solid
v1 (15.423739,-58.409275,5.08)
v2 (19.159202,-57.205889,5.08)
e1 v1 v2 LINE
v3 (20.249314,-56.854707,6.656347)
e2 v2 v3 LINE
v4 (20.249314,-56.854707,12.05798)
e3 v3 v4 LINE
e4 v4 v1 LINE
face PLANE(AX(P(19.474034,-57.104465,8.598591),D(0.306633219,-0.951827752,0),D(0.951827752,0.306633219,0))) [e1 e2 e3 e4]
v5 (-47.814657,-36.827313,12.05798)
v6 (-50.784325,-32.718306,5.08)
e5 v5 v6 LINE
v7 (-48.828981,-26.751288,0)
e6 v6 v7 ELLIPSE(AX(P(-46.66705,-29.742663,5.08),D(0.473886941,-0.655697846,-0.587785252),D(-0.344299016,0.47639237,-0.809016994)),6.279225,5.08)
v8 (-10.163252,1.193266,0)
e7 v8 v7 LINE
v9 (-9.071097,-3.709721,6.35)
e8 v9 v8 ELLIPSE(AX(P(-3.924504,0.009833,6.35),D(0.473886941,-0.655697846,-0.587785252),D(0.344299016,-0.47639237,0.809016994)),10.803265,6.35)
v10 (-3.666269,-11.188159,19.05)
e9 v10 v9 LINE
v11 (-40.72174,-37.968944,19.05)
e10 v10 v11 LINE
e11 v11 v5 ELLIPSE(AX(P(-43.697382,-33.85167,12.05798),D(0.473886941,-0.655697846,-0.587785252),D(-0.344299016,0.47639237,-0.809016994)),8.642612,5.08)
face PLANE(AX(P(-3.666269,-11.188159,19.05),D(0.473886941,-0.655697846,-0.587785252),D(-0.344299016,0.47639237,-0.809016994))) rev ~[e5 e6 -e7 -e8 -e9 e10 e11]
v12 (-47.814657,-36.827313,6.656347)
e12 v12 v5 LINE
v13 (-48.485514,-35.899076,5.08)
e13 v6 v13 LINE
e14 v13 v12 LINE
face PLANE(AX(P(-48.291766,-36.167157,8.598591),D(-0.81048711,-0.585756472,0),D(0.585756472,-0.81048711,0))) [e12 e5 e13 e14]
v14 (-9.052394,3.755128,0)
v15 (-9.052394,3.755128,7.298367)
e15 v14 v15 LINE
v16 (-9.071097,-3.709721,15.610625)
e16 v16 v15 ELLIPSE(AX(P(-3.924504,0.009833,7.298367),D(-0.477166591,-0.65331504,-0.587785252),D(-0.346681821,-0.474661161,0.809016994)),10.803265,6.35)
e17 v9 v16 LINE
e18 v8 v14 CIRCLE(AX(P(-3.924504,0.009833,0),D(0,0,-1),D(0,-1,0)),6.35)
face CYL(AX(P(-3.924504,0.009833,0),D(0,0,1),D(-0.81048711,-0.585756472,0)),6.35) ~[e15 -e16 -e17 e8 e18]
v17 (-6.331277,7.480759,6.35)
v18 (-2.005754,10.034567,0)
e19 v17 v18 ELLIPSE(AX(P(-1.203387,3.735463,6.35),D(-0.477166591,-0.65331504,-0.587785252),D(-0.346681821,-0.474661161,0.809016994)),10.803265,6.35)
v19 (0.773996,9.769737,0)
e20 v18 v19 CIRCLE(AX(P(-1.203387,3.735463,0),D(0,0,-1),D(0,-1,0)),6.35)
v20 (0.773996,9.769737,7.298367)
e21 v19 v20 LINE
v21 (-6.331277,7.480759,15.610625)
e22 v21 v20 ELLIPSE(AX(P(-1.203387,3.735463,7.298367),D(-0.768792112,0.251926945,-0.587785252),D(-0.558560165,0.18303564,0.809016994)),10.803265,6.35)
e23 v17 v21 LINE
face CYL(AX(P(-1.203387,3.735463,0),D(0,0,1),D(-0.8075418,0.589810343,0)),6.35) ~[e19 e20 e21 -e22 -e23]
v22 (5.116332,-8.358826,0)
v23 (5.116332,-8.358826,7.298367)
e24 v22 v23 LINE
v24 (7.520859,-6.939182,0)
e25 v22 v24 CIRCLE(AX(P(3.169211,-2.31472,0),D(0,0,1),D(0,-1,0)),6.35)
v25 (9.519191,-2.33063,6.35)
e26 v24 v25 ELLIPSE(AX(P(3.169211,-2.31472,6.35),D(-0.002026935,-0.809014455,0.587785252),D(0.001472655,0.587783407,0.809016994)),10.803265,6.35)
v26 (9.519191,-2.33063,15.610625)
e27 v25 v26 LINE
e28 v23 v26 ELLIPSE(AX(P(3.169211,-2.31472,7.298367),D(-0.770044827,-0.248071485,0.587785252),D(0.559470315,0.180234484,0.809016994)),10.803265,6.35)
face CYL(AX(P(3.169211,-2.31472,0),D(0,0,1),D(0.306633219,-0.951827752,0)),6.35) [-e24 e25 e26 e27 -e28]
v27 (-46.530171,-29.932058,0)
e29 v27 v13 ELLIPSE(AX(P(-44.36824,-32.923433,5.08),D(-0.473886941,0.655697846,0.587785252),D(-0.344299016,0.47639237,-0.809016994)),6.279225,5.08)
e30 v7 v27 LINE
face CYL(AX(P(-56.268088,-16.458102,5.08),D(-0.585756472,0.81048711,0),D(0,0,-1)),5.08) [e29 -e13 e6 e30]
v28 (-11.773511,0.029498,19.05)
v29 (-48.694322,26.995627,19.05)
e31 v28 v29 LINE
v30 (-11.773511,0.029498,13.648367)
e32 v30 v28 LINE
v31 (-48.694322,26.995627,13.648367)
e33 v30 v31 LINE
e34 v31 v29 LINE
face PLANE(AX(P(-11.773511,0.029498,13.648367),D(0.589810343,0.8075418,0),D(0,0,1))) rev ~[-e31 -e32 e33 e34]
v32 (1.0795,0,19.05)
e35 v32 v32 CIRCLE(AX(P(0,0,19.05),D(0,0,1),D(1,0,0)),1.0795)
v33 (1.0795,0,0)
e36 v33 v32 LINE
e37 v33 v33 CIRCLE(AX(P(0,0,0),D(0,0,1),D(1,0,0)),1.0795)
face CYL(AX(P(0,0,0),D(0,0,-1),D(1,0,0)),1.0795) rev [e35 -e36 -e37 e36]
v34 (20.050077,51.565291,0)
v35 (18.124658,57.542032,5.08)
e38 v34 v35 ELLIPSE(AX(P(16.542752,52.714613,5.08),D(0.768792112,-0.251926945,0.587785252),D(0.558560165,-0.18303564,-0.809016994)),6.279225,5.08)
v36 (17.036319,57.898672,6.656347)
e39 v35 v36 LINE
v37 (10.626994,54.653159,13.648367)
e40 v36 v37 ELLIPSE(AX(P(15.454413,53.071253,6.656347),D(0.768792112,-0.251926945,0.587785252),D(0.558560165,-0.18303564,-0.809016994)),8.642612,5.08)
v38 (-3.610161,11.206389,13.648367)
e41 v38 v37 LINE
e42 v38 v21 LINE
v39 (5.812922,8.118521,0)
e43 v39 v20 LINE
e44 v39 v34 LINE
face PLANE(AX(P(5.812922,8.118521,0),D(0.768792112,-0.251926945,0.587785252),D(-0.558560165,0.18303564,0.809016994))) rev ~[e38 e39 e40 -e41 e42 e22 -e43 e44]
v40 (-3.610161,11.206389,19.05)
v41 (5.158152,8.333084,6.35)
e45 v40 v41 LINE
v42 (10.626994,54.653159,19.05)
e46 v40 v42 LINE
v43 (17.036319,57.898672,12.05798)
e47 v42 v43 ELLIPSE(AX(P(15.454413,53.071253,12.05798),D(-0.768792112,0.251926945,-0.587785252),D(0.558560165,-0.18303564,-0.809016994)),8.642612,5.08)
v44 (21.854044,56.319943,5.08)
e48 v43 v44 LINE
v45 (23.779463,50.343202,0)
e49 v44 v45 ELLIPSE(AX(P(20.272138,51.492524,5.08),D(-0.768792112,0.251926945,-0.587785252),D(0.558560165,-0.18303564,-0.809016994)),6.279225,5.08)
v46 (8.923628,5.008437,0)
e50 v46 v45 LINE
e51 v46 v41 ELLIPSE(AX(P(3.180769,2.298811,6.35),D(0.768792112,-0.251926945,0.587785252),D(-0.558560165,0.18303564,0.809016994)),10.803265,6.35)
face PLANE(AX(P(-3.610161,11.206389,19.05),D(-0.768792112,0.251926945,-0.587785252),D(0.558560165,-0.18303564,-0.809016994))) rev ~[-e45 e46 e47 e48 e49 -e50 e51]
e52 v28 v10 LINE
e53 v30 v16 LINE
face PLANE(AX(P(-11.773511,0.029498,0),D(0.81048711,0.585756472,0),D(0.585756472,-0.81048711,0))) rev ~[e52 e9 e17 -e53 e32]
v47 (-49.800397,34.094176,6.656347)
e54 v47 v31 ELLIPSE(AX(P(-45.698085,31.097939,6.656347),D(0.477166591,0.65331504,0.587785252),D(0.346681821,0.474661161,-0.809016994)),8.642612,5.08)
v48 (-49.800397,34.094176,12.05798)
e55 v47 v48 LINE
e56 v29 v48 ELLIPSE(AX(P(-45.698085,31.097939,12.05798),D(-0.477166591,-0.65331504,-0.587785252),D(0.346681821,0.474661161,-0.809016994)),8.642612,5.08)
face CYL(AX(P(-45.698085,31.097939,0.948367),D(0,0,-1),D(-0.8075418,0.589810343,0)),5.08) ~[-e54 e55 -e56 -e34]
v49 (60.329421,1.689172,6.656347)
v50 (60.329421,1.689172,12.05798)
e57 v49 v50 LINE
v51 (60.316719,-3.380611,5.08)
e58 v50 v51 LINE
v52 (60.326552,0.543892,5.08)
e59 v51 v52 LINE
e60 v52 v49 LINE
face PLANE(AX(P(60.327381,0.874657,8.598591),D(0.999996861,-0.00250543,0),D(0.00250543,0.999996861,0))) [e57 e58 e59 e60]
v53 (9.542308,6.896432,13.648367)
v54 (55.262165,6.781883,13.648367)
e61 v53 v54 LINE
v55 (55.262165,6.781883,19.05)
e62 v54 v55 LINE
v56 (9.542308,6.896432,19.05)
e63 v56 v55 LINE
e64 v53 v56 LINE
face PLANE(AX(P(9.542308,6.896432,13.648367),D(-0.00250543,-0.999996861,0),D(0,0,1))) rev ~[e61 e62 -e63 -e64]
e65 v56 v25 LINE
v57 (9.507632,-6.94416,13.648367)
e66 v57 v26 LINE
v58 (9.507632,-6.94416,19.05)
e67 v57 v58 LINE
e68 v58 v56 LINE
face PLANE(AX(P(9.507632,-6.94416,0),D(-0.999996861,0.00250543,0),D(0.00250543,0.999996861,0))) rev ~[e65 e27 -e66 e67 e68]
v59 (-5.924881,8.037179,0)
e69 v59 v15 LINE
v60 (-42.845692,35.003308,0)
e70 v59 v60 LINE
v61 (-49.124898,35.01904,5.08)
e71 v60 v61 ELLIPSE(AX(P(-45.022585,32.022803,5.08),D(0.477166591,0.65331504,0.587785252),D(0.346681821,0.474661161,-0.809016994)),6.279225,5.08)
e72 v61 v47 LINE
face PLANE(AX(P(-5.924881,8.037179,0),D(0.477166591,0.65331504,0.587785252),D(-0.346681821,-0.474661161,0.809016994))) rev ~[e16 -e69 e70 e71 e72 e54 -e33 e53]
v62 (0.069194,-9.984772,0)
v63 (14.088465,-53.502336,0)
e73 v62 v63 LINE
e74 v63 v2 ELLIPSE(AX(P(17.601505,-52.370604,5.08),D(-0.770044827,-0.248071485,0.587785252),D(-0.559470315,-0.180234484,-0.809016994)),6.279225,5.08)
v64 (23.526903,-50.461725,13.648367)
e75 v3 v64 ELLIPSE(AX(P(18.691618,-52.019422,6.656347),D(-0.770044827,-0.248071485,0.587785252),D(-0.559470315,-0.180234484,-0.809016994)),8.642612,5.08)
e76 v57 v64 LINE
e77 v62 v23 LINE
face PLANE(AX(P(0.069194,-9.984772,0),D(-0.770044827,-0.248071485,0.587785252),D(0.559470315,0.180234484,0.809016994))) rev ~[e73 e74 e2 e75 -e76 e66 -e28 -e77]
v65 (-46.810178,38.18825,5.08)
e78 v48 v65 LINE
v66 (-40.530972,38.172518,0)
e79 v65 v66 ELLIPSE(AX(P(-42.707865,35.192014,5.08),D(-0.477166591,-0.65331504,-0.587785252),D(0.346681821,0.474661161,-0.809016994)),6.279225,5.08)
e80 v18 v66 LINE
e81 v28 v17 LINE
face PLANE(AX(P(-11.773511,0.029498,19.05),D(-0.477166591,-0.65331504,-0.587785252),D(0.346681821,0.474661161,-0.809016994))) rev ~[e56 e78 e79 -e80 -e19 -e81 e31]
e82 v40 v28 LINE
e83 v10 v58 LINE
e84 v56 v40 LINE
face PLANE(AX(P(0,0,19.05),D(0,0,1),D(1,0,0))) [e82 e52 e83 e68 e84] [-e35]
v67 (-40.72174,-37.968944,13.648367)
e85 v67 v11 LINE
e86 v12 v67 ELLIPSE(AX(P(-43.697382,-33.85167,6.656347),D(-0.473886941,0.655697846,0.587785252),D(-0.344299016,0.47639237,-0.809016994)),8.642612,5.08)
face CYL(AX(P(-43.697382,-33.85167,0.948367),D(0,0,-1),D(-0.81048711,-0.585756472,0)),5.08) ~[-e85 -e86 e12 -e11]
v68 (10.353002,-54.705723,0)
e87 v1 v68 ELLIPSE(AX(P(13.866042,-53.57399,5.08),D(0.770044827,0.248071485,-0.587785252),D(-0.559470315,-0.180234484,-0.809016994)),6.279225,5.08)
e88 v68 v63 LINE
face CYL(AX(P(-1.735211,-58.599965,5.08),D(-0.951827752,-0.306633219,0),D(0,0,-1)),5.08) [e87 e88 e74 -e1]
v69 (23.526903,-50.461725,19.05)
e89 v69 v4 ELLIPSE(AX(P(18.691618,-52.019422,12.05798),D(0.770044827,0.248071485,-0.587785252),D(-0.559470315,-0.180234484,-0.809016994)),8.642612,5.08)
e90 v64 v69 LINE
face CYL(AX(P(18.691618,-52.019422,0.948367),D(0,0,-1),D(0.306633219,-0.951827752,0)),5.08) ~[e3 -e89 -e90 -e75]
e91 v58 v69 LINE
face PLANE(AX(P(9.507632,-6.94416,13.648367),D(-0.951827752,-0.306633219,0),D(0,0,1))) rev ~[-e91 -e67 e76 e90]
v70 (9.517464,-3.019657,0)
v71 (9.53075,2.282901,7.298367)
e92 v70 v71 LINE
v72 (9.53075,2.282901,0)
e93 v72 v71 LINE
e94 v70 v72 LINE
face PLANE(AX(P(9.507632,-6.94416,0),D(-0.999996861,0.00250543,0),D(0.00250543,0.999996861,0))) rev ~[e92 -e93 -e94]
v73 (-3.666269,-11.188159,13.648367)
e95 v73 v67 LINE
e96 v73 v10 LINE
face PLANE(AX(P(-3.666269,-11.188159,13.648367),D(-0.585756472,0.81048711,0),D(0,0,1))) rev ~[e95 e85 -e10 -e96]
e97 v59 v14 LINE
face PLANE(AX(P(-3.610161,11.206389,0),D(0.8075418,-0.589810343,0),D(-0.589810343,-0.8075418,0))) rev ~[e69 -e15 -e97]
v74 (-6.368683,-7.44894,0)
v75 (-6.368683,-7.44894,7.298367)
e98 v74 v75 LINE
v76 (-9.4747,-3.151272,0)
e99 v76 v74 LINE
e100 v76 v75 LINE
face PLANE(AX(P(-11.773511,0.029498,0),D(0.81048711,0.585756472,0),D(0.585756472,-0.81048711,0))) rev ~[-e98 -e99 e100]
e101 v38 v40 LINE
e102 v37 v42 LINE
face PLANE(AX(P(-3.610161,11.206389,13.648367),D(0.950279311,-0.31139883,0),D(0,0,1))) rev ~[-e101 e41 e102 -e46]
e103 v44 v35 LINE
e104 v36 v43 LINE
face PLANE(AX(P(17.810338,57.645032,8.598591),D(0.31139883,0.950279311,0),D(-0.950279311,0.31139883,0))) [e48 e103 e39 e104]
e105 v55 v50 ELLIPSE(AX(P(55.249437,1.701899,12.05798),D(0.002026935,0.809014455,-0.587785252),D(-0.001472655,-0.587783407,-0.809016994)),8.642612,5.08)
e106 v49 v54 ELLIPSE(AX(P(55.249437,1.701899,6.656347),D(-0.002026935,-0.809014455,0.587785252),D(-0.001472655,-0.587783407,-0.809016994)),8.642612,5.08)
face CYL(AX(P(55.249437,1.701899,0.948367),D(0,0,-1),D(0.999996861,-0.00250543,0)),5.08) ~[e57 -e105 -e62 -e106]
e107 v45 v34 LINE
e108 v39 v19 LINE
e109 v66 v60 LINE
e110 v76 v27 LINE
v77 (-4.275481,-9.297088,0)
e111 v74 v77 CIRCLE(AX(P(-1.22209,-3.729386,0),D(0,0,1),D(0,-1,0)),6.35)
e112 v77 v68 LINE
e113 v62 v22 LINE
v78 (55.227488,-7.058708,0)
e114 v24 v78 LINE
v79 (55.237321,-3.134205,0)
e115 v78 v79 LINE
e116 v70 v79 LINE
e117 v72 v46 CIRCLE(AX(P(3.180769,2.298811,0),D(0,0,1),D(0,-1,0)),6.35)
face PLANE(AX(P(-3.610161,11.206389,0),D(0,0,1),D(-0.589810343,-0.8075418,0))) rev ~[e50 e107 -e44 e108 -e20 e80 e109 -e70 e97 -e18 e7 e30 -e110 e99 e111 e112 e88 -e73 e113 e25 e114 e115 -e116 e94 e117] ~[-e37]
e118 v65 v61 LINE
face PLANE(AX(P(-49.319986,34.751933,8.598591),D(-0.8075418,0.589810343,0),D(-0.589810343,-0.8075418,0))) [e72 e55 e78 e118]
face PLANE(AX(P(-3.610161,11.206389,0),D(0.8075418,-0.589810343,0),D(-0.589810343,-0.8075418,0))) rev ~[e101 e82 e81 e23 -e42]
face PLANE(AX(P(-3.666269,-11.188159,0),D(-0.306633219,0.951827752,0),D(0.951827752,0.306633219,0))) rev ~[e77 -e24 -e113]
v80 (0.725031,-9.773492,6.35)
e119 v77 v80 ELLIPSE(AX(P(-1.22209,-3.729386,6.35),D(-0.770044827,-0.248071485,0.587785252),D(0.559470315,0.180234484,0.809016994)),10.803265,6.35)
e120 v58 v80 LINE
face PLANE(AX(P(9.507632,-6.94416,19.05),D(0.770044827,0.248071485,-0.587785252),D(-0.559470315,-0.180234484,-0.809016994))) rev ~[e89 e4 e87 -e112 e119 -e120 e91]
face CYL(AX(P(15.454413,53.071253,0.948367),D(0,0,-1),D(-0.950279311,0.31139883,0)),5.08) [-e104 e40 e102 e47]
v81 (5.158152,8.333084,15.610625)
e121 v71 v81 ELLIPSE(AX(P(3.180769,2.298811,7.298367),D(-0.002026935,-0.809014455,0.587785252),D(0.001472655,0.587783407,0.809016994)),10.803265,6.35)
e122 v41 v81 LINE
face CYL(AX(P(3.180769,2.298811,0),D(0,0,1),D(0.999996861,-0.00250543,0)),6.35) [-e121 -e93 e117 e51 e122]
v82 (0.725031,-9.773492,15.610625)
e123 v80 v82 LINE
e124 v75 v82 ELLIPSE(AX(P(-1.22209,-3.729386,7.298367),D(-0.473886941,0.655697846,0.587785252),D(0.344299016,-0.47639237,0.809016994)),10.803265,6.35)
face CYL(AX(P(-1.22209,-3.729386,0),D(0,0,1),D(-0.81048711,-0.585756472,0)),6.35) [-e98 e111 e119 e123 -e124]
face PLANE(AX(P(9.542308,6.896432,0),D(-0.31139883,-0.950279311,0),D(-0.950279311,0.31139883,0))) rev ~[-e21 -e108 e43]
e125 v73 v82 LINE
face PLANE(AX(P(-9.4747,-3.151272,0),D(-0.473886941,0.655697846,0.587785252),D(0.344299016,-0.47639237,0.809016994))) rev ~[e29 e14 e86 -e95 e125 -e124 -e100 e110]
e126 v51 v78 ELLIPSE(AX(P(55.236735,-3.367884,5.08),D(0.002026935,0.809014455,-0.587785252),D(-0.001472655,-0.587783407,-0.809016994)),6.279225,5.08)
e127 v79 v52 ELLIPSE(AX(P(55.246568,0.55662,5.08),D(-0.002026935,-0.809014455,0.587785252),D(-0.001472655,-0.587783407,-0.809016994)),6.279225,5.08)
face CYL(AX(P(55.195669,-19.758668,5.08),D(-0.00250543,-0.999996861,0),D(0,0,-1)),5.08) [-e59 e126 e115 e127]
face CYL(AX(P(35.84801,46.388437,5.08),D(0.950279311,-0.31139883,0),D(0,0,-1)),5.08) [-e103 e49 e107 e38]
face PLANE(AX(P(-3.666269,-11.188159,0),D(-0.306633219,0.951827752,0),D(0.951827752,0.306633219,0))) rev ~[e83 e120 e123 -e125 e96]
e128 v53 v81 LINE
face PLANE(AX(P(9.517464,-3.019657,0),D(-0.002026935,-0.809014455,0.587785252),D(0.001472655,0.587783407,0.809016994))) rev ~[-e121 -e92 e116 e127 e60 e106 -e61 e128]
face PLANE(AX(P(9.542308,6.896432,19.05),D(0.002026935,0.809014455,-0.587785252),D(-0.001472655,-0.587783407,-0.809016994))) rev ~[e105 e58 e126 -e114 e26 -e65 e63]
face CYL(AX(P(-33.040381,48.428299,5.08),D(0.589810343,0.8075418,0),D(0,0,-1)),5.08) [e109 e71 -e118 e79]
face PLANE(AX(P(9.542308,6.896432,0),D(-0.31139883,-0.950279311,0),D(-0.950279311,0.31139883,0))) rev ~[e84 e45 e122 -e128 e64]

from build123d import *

# Parameters (mm, degrees)
F0_R          = 1.0795
F1_DEPTH      = 19.05
F3_DEPTH      = 50.8
F5_DEPTH      = 50.8
F7_DEPTH      = 50.8
F9_DEPTH      = 50.8
F11_DEPTH     = 50.8
F12_R         = 6.35
F13_T1_DEPTH  = 30.801632633
F13_T3_DEPTH  = 29.3245158286
F13_T5_DEPTH  = 29.3245158286
F13_T7_DEPTH  = 29.3245158286
F13_T9_DEPTH  = 29.3245158286
F13_T11_DEPTH = 29.3245158286


# Not quite as in the source:
# - a fillet or chamfer that OpenCascade refuses, or shapes differently, is made with other operations: its cross-section is extruded or revolved along the edge and cut away or added


with BuildPart() as f1:
    # F0 (on Top) → F1 (new body)
    with BuildSketch(Plane.XY):
        Polygon((-3.666268911, -11.1881585915), (9.5076317344, -6.9441600789), (9.5423084754, 6.8964316395), (-3.6101607654, 11.2063892332), (-11.7735105333, 0.0294977978), align=None)
        Circle(F0_R, mode=Mode.SUBTRACT)
    extrude(amount=F1_DEPTH)

    # F2 (on face) → F3 (join)
    with BuildSketch(Plane(origin=(-7.7198897222, -5.5793303969, 0), x_dir=(0.5857564721, -0.8104871099, 0), z_dir=(-0.8104871099, -0.5857564721, 0))):
        Polygon((6.9203175793, 19.05), (-6.9203175793, 0), (-2.9958017507, 0), (6.9203175793, 13.648367367), align=None)
    extrude(amount=F3_DEPTH)

    # F4 (on face) → F5 (join)
    with BuildSketch(Plane(origin=(2.9206814117, -9.0661593352, 0), x_dir=(0.9518277517, 0.3066332191, 0), z_dir=(0.3066332191, -0.9518277517, 0))):
        Polygon((6.9203175793, 19.05), (-6.9203175793, 0), (-2.9958017507, 0), (6.9203175793, 13.648367367), align=None)
    extrude(amount=F5_DEPTH)

    # F6 (on face) → F7 (join)
    with BuildSketch(Plane(origin=(9.5249701049, -0.0238642197, 0), x_dir=(0.0025054299, 0.9999968614, 0), z_dir=(0.9999968614, -0.0025054299, 0))):
        Polygon((6.9203175793, 19.05), (-6.9203175793, 0), (-2.9958017507, 0), (6.9203175793, 13.648367367), align=None)
    extrude(amount=F7_DEPTH)

    # F8 (on face) → F9 (join)
    with BuildSketch(Plane(origin=(2.966073855, 9.0514104363, 0), x_dir=(-0.9502793109, 0.3113988299, 0), z_dir=(0.3113988299, 0.9502793109, 0))):
        Polygon((6.9203175793, 19.05), (-6.9203175793, 0), (-2.9958017507, 0), (6.9203175793, 13.648367367), align=None)
    extrude(amount=F9_DEPTH)

    # F10 (on face) → F11 (join)
    with BuildSketch(Plane(origin=(-7.6918356494, 5.6179435155, 0), x_dir=(-0.5898103428, -0.8075418005, 0), z_dir=(-0.8075418005, 0.5898103428, 0))):
        Polygon((6.9203175793, 19.05), (-6.9203175793, 0), (-2.9958017507, 0), (6.9203175793, 13.648367367), align=None)
    extrude(amount=F11_DEPTH)

    # F12
    f12_edges = [f1.edges().sort_by_distance(p)[0] for p in [
        (-3.610161, 11.206389, 6.824184),
        (-11.773511, 0.029498, 6.824184),
        (-3.666269, -11.188159, 6.824184),
        (9.507632, -6.94416, 6.824184),
        (9.542308, 6.896432, 6.824184),
    ]]
    fillet(f12_edges, radius=F12_R)

    # F13: fillet of radius 5.08 on 10 edges, made by hand

    # F13_s2 → F13_t1 (cut)
    with BuildSketch(Plane.XY.offset(0.948367367)):
        with BuildLine():
            ThreePointArc((-49.800397455, 34.09417556), (-50.7175171639, 30.3158253164), (-48.6943216503, 26.9956266721))
            Line((-48.6943216503, 26.9956266721), (-52.7966339966, 29.9918632137))
            Line((-52.7966339966, 29.9918632137), (-49.800397455, 34.09417556))
        make_face()
        with BuildLine():
            ThreePointArc((-47.8146569743, -36.8273128564), (-44.5046379302, -38.8671199678), (-40.7217395774, -37.9689444966))
            Line((-40.7217395774, -37.9689444966), (-44.8390140959, -40.9445873749))
            Line((-44.8390140959, -40.9445873749), (-47.8146569743, -36.8273128564))
        make_face()
        with BuildLine():
            ThreePointArc((20.2493142845, -56.8547066196), (23.2121382661, -54.3370265013), (23.5269025104, -50.4617248879))
            Line((23.5269025104, -50.4617248879), (25.0845992633, -55.2970098667))
            Line((25.0845992633, -55.2970098667), (20.2493142845, -56.8547066196))
        make_face()
        with BuildLine():
            ThreePointArc((60.329421451, 1.6891717451), (58.8505283301, 5.2849907424), (55.2621649789, 6.7818833849))
            Line((55.2621649789, 6.7818833849), (60.3421490348, 6.769155801))
            Line((60.3421490348, 6.769155801), (60.329421451, 1.6891717451))
        make_face()
        with BuildLine():
            ThreePointArc((10.6269937385, 54.6531593275), (13.1594884979, 57.6033304103), (17.0363186938, 57.8986721709))
            Line((17.0363186938, 57.8986721709), (12.2088997945, 59.4805782269))
            Line((12.2088997945, 59.4805782269), (10.6269937385, 54.6531593275))
        make_face()
    extrude(amount=F13_T1_DEPTH, mode=Mode.SUBTRACT)

    # F13_s4 → F13_t3 (cut)
    with BuildSketch(Plane(origin=(11.5722662379, 15.8442265835, 0), x_dir=(0, 0, 1), z_dir=(-0.5898103428, -0.8075418005, 0))):
        with BuildLine():
            ThreePointArc((0, 55.245), (1.4878975516, 58.8371024484), (5.08, 60.325))
            Line((5.08, 60.325), (0, 60.325))
            Line((0, 60.325), (0, 55.245))
        make_face()
    extrude(amount=F13_T3_DEPTH, mode=Mode.SUBTRACT)

    # F13_s6 → F13_t5 (cut)
    with BuildSketch(Plane(origin=(-11.492728007, 15.9020144909, 0), x_dir=(0, 0, 1), z_dir=(0.5857564721, -0.8104871099, 0))):
        with BuildLine():
            ThreePointArc((0, 55.245), (1.4878975516, 58.8371024484), (5.08, 60.325))
            Line((5.08, 60.325), (0, 60.325))
            Line((0, 60.325), (0, 55.245))
        make_face()
    extrude(amount=F13_T5_DEPTH, mode=Mode.SUBTRACT)

    # F13_s8 → F13_t7 (cut)
    with BuildSketch(Plane(origin=(-18.6751627697, -6.0162411386, 0), x_dir=(0, 0, 1), z_dir=(0.9518277517, 0.3066332191, 0))):
        with BuildLine():
            ThreePointArc((0, 55.245), (1.4878975516, 58.8371024484), (5.08, 60.325))
            Line((5.08, 60.325), (0, 60.325))
            Line((0, 60.325), (0, 55.245))
        make_face()
    extrude(amount=F13_T7_DEPTH, mode=Mode.SUBTRACT)

    # F13_s10 → F13_t9 (cut)
    with BuildSketch(Plane(origin=(-0.0491573301, -19.620255999, 0), x_dir=(0, 0, 1), z_dir=(0.0025054299, 0.9999968614, 0))):
        with BuildLine():
            ThreePointArc((0, 55.245), (1.4878975516, 58.8371024484), (5.08, 60.325))
            Line((5.08, 60.325), (0, 60.325))
            Line((0, 60.325), (0, 55.245))
        make_face()
    extrude(amount=F13_T9_DEPTH, mode=Mode.SUBTRACT)

    # F13_s12 → F13_t11 (cut)
    with BuildSketch(Plane(origin=(18.6447818689, -6.1097439368, 0), x_dir=(0, 0, 1), z_dir=(-0.9502793109, 0.3113988299, 0))):
        with BuildLine():
            ThreePointArc((0, 55.245), (1.4878975516, 58.8371024484), (5.08, 60.325))
            Line((5.08, 60.325), (0, 60.325))
            Line((0, 60.325), (0, 55.245))
        make_face()
    extrude(amount=F13_T11_DEPTH, mode=Mode.SUBTRACT)


solid = f1.part
